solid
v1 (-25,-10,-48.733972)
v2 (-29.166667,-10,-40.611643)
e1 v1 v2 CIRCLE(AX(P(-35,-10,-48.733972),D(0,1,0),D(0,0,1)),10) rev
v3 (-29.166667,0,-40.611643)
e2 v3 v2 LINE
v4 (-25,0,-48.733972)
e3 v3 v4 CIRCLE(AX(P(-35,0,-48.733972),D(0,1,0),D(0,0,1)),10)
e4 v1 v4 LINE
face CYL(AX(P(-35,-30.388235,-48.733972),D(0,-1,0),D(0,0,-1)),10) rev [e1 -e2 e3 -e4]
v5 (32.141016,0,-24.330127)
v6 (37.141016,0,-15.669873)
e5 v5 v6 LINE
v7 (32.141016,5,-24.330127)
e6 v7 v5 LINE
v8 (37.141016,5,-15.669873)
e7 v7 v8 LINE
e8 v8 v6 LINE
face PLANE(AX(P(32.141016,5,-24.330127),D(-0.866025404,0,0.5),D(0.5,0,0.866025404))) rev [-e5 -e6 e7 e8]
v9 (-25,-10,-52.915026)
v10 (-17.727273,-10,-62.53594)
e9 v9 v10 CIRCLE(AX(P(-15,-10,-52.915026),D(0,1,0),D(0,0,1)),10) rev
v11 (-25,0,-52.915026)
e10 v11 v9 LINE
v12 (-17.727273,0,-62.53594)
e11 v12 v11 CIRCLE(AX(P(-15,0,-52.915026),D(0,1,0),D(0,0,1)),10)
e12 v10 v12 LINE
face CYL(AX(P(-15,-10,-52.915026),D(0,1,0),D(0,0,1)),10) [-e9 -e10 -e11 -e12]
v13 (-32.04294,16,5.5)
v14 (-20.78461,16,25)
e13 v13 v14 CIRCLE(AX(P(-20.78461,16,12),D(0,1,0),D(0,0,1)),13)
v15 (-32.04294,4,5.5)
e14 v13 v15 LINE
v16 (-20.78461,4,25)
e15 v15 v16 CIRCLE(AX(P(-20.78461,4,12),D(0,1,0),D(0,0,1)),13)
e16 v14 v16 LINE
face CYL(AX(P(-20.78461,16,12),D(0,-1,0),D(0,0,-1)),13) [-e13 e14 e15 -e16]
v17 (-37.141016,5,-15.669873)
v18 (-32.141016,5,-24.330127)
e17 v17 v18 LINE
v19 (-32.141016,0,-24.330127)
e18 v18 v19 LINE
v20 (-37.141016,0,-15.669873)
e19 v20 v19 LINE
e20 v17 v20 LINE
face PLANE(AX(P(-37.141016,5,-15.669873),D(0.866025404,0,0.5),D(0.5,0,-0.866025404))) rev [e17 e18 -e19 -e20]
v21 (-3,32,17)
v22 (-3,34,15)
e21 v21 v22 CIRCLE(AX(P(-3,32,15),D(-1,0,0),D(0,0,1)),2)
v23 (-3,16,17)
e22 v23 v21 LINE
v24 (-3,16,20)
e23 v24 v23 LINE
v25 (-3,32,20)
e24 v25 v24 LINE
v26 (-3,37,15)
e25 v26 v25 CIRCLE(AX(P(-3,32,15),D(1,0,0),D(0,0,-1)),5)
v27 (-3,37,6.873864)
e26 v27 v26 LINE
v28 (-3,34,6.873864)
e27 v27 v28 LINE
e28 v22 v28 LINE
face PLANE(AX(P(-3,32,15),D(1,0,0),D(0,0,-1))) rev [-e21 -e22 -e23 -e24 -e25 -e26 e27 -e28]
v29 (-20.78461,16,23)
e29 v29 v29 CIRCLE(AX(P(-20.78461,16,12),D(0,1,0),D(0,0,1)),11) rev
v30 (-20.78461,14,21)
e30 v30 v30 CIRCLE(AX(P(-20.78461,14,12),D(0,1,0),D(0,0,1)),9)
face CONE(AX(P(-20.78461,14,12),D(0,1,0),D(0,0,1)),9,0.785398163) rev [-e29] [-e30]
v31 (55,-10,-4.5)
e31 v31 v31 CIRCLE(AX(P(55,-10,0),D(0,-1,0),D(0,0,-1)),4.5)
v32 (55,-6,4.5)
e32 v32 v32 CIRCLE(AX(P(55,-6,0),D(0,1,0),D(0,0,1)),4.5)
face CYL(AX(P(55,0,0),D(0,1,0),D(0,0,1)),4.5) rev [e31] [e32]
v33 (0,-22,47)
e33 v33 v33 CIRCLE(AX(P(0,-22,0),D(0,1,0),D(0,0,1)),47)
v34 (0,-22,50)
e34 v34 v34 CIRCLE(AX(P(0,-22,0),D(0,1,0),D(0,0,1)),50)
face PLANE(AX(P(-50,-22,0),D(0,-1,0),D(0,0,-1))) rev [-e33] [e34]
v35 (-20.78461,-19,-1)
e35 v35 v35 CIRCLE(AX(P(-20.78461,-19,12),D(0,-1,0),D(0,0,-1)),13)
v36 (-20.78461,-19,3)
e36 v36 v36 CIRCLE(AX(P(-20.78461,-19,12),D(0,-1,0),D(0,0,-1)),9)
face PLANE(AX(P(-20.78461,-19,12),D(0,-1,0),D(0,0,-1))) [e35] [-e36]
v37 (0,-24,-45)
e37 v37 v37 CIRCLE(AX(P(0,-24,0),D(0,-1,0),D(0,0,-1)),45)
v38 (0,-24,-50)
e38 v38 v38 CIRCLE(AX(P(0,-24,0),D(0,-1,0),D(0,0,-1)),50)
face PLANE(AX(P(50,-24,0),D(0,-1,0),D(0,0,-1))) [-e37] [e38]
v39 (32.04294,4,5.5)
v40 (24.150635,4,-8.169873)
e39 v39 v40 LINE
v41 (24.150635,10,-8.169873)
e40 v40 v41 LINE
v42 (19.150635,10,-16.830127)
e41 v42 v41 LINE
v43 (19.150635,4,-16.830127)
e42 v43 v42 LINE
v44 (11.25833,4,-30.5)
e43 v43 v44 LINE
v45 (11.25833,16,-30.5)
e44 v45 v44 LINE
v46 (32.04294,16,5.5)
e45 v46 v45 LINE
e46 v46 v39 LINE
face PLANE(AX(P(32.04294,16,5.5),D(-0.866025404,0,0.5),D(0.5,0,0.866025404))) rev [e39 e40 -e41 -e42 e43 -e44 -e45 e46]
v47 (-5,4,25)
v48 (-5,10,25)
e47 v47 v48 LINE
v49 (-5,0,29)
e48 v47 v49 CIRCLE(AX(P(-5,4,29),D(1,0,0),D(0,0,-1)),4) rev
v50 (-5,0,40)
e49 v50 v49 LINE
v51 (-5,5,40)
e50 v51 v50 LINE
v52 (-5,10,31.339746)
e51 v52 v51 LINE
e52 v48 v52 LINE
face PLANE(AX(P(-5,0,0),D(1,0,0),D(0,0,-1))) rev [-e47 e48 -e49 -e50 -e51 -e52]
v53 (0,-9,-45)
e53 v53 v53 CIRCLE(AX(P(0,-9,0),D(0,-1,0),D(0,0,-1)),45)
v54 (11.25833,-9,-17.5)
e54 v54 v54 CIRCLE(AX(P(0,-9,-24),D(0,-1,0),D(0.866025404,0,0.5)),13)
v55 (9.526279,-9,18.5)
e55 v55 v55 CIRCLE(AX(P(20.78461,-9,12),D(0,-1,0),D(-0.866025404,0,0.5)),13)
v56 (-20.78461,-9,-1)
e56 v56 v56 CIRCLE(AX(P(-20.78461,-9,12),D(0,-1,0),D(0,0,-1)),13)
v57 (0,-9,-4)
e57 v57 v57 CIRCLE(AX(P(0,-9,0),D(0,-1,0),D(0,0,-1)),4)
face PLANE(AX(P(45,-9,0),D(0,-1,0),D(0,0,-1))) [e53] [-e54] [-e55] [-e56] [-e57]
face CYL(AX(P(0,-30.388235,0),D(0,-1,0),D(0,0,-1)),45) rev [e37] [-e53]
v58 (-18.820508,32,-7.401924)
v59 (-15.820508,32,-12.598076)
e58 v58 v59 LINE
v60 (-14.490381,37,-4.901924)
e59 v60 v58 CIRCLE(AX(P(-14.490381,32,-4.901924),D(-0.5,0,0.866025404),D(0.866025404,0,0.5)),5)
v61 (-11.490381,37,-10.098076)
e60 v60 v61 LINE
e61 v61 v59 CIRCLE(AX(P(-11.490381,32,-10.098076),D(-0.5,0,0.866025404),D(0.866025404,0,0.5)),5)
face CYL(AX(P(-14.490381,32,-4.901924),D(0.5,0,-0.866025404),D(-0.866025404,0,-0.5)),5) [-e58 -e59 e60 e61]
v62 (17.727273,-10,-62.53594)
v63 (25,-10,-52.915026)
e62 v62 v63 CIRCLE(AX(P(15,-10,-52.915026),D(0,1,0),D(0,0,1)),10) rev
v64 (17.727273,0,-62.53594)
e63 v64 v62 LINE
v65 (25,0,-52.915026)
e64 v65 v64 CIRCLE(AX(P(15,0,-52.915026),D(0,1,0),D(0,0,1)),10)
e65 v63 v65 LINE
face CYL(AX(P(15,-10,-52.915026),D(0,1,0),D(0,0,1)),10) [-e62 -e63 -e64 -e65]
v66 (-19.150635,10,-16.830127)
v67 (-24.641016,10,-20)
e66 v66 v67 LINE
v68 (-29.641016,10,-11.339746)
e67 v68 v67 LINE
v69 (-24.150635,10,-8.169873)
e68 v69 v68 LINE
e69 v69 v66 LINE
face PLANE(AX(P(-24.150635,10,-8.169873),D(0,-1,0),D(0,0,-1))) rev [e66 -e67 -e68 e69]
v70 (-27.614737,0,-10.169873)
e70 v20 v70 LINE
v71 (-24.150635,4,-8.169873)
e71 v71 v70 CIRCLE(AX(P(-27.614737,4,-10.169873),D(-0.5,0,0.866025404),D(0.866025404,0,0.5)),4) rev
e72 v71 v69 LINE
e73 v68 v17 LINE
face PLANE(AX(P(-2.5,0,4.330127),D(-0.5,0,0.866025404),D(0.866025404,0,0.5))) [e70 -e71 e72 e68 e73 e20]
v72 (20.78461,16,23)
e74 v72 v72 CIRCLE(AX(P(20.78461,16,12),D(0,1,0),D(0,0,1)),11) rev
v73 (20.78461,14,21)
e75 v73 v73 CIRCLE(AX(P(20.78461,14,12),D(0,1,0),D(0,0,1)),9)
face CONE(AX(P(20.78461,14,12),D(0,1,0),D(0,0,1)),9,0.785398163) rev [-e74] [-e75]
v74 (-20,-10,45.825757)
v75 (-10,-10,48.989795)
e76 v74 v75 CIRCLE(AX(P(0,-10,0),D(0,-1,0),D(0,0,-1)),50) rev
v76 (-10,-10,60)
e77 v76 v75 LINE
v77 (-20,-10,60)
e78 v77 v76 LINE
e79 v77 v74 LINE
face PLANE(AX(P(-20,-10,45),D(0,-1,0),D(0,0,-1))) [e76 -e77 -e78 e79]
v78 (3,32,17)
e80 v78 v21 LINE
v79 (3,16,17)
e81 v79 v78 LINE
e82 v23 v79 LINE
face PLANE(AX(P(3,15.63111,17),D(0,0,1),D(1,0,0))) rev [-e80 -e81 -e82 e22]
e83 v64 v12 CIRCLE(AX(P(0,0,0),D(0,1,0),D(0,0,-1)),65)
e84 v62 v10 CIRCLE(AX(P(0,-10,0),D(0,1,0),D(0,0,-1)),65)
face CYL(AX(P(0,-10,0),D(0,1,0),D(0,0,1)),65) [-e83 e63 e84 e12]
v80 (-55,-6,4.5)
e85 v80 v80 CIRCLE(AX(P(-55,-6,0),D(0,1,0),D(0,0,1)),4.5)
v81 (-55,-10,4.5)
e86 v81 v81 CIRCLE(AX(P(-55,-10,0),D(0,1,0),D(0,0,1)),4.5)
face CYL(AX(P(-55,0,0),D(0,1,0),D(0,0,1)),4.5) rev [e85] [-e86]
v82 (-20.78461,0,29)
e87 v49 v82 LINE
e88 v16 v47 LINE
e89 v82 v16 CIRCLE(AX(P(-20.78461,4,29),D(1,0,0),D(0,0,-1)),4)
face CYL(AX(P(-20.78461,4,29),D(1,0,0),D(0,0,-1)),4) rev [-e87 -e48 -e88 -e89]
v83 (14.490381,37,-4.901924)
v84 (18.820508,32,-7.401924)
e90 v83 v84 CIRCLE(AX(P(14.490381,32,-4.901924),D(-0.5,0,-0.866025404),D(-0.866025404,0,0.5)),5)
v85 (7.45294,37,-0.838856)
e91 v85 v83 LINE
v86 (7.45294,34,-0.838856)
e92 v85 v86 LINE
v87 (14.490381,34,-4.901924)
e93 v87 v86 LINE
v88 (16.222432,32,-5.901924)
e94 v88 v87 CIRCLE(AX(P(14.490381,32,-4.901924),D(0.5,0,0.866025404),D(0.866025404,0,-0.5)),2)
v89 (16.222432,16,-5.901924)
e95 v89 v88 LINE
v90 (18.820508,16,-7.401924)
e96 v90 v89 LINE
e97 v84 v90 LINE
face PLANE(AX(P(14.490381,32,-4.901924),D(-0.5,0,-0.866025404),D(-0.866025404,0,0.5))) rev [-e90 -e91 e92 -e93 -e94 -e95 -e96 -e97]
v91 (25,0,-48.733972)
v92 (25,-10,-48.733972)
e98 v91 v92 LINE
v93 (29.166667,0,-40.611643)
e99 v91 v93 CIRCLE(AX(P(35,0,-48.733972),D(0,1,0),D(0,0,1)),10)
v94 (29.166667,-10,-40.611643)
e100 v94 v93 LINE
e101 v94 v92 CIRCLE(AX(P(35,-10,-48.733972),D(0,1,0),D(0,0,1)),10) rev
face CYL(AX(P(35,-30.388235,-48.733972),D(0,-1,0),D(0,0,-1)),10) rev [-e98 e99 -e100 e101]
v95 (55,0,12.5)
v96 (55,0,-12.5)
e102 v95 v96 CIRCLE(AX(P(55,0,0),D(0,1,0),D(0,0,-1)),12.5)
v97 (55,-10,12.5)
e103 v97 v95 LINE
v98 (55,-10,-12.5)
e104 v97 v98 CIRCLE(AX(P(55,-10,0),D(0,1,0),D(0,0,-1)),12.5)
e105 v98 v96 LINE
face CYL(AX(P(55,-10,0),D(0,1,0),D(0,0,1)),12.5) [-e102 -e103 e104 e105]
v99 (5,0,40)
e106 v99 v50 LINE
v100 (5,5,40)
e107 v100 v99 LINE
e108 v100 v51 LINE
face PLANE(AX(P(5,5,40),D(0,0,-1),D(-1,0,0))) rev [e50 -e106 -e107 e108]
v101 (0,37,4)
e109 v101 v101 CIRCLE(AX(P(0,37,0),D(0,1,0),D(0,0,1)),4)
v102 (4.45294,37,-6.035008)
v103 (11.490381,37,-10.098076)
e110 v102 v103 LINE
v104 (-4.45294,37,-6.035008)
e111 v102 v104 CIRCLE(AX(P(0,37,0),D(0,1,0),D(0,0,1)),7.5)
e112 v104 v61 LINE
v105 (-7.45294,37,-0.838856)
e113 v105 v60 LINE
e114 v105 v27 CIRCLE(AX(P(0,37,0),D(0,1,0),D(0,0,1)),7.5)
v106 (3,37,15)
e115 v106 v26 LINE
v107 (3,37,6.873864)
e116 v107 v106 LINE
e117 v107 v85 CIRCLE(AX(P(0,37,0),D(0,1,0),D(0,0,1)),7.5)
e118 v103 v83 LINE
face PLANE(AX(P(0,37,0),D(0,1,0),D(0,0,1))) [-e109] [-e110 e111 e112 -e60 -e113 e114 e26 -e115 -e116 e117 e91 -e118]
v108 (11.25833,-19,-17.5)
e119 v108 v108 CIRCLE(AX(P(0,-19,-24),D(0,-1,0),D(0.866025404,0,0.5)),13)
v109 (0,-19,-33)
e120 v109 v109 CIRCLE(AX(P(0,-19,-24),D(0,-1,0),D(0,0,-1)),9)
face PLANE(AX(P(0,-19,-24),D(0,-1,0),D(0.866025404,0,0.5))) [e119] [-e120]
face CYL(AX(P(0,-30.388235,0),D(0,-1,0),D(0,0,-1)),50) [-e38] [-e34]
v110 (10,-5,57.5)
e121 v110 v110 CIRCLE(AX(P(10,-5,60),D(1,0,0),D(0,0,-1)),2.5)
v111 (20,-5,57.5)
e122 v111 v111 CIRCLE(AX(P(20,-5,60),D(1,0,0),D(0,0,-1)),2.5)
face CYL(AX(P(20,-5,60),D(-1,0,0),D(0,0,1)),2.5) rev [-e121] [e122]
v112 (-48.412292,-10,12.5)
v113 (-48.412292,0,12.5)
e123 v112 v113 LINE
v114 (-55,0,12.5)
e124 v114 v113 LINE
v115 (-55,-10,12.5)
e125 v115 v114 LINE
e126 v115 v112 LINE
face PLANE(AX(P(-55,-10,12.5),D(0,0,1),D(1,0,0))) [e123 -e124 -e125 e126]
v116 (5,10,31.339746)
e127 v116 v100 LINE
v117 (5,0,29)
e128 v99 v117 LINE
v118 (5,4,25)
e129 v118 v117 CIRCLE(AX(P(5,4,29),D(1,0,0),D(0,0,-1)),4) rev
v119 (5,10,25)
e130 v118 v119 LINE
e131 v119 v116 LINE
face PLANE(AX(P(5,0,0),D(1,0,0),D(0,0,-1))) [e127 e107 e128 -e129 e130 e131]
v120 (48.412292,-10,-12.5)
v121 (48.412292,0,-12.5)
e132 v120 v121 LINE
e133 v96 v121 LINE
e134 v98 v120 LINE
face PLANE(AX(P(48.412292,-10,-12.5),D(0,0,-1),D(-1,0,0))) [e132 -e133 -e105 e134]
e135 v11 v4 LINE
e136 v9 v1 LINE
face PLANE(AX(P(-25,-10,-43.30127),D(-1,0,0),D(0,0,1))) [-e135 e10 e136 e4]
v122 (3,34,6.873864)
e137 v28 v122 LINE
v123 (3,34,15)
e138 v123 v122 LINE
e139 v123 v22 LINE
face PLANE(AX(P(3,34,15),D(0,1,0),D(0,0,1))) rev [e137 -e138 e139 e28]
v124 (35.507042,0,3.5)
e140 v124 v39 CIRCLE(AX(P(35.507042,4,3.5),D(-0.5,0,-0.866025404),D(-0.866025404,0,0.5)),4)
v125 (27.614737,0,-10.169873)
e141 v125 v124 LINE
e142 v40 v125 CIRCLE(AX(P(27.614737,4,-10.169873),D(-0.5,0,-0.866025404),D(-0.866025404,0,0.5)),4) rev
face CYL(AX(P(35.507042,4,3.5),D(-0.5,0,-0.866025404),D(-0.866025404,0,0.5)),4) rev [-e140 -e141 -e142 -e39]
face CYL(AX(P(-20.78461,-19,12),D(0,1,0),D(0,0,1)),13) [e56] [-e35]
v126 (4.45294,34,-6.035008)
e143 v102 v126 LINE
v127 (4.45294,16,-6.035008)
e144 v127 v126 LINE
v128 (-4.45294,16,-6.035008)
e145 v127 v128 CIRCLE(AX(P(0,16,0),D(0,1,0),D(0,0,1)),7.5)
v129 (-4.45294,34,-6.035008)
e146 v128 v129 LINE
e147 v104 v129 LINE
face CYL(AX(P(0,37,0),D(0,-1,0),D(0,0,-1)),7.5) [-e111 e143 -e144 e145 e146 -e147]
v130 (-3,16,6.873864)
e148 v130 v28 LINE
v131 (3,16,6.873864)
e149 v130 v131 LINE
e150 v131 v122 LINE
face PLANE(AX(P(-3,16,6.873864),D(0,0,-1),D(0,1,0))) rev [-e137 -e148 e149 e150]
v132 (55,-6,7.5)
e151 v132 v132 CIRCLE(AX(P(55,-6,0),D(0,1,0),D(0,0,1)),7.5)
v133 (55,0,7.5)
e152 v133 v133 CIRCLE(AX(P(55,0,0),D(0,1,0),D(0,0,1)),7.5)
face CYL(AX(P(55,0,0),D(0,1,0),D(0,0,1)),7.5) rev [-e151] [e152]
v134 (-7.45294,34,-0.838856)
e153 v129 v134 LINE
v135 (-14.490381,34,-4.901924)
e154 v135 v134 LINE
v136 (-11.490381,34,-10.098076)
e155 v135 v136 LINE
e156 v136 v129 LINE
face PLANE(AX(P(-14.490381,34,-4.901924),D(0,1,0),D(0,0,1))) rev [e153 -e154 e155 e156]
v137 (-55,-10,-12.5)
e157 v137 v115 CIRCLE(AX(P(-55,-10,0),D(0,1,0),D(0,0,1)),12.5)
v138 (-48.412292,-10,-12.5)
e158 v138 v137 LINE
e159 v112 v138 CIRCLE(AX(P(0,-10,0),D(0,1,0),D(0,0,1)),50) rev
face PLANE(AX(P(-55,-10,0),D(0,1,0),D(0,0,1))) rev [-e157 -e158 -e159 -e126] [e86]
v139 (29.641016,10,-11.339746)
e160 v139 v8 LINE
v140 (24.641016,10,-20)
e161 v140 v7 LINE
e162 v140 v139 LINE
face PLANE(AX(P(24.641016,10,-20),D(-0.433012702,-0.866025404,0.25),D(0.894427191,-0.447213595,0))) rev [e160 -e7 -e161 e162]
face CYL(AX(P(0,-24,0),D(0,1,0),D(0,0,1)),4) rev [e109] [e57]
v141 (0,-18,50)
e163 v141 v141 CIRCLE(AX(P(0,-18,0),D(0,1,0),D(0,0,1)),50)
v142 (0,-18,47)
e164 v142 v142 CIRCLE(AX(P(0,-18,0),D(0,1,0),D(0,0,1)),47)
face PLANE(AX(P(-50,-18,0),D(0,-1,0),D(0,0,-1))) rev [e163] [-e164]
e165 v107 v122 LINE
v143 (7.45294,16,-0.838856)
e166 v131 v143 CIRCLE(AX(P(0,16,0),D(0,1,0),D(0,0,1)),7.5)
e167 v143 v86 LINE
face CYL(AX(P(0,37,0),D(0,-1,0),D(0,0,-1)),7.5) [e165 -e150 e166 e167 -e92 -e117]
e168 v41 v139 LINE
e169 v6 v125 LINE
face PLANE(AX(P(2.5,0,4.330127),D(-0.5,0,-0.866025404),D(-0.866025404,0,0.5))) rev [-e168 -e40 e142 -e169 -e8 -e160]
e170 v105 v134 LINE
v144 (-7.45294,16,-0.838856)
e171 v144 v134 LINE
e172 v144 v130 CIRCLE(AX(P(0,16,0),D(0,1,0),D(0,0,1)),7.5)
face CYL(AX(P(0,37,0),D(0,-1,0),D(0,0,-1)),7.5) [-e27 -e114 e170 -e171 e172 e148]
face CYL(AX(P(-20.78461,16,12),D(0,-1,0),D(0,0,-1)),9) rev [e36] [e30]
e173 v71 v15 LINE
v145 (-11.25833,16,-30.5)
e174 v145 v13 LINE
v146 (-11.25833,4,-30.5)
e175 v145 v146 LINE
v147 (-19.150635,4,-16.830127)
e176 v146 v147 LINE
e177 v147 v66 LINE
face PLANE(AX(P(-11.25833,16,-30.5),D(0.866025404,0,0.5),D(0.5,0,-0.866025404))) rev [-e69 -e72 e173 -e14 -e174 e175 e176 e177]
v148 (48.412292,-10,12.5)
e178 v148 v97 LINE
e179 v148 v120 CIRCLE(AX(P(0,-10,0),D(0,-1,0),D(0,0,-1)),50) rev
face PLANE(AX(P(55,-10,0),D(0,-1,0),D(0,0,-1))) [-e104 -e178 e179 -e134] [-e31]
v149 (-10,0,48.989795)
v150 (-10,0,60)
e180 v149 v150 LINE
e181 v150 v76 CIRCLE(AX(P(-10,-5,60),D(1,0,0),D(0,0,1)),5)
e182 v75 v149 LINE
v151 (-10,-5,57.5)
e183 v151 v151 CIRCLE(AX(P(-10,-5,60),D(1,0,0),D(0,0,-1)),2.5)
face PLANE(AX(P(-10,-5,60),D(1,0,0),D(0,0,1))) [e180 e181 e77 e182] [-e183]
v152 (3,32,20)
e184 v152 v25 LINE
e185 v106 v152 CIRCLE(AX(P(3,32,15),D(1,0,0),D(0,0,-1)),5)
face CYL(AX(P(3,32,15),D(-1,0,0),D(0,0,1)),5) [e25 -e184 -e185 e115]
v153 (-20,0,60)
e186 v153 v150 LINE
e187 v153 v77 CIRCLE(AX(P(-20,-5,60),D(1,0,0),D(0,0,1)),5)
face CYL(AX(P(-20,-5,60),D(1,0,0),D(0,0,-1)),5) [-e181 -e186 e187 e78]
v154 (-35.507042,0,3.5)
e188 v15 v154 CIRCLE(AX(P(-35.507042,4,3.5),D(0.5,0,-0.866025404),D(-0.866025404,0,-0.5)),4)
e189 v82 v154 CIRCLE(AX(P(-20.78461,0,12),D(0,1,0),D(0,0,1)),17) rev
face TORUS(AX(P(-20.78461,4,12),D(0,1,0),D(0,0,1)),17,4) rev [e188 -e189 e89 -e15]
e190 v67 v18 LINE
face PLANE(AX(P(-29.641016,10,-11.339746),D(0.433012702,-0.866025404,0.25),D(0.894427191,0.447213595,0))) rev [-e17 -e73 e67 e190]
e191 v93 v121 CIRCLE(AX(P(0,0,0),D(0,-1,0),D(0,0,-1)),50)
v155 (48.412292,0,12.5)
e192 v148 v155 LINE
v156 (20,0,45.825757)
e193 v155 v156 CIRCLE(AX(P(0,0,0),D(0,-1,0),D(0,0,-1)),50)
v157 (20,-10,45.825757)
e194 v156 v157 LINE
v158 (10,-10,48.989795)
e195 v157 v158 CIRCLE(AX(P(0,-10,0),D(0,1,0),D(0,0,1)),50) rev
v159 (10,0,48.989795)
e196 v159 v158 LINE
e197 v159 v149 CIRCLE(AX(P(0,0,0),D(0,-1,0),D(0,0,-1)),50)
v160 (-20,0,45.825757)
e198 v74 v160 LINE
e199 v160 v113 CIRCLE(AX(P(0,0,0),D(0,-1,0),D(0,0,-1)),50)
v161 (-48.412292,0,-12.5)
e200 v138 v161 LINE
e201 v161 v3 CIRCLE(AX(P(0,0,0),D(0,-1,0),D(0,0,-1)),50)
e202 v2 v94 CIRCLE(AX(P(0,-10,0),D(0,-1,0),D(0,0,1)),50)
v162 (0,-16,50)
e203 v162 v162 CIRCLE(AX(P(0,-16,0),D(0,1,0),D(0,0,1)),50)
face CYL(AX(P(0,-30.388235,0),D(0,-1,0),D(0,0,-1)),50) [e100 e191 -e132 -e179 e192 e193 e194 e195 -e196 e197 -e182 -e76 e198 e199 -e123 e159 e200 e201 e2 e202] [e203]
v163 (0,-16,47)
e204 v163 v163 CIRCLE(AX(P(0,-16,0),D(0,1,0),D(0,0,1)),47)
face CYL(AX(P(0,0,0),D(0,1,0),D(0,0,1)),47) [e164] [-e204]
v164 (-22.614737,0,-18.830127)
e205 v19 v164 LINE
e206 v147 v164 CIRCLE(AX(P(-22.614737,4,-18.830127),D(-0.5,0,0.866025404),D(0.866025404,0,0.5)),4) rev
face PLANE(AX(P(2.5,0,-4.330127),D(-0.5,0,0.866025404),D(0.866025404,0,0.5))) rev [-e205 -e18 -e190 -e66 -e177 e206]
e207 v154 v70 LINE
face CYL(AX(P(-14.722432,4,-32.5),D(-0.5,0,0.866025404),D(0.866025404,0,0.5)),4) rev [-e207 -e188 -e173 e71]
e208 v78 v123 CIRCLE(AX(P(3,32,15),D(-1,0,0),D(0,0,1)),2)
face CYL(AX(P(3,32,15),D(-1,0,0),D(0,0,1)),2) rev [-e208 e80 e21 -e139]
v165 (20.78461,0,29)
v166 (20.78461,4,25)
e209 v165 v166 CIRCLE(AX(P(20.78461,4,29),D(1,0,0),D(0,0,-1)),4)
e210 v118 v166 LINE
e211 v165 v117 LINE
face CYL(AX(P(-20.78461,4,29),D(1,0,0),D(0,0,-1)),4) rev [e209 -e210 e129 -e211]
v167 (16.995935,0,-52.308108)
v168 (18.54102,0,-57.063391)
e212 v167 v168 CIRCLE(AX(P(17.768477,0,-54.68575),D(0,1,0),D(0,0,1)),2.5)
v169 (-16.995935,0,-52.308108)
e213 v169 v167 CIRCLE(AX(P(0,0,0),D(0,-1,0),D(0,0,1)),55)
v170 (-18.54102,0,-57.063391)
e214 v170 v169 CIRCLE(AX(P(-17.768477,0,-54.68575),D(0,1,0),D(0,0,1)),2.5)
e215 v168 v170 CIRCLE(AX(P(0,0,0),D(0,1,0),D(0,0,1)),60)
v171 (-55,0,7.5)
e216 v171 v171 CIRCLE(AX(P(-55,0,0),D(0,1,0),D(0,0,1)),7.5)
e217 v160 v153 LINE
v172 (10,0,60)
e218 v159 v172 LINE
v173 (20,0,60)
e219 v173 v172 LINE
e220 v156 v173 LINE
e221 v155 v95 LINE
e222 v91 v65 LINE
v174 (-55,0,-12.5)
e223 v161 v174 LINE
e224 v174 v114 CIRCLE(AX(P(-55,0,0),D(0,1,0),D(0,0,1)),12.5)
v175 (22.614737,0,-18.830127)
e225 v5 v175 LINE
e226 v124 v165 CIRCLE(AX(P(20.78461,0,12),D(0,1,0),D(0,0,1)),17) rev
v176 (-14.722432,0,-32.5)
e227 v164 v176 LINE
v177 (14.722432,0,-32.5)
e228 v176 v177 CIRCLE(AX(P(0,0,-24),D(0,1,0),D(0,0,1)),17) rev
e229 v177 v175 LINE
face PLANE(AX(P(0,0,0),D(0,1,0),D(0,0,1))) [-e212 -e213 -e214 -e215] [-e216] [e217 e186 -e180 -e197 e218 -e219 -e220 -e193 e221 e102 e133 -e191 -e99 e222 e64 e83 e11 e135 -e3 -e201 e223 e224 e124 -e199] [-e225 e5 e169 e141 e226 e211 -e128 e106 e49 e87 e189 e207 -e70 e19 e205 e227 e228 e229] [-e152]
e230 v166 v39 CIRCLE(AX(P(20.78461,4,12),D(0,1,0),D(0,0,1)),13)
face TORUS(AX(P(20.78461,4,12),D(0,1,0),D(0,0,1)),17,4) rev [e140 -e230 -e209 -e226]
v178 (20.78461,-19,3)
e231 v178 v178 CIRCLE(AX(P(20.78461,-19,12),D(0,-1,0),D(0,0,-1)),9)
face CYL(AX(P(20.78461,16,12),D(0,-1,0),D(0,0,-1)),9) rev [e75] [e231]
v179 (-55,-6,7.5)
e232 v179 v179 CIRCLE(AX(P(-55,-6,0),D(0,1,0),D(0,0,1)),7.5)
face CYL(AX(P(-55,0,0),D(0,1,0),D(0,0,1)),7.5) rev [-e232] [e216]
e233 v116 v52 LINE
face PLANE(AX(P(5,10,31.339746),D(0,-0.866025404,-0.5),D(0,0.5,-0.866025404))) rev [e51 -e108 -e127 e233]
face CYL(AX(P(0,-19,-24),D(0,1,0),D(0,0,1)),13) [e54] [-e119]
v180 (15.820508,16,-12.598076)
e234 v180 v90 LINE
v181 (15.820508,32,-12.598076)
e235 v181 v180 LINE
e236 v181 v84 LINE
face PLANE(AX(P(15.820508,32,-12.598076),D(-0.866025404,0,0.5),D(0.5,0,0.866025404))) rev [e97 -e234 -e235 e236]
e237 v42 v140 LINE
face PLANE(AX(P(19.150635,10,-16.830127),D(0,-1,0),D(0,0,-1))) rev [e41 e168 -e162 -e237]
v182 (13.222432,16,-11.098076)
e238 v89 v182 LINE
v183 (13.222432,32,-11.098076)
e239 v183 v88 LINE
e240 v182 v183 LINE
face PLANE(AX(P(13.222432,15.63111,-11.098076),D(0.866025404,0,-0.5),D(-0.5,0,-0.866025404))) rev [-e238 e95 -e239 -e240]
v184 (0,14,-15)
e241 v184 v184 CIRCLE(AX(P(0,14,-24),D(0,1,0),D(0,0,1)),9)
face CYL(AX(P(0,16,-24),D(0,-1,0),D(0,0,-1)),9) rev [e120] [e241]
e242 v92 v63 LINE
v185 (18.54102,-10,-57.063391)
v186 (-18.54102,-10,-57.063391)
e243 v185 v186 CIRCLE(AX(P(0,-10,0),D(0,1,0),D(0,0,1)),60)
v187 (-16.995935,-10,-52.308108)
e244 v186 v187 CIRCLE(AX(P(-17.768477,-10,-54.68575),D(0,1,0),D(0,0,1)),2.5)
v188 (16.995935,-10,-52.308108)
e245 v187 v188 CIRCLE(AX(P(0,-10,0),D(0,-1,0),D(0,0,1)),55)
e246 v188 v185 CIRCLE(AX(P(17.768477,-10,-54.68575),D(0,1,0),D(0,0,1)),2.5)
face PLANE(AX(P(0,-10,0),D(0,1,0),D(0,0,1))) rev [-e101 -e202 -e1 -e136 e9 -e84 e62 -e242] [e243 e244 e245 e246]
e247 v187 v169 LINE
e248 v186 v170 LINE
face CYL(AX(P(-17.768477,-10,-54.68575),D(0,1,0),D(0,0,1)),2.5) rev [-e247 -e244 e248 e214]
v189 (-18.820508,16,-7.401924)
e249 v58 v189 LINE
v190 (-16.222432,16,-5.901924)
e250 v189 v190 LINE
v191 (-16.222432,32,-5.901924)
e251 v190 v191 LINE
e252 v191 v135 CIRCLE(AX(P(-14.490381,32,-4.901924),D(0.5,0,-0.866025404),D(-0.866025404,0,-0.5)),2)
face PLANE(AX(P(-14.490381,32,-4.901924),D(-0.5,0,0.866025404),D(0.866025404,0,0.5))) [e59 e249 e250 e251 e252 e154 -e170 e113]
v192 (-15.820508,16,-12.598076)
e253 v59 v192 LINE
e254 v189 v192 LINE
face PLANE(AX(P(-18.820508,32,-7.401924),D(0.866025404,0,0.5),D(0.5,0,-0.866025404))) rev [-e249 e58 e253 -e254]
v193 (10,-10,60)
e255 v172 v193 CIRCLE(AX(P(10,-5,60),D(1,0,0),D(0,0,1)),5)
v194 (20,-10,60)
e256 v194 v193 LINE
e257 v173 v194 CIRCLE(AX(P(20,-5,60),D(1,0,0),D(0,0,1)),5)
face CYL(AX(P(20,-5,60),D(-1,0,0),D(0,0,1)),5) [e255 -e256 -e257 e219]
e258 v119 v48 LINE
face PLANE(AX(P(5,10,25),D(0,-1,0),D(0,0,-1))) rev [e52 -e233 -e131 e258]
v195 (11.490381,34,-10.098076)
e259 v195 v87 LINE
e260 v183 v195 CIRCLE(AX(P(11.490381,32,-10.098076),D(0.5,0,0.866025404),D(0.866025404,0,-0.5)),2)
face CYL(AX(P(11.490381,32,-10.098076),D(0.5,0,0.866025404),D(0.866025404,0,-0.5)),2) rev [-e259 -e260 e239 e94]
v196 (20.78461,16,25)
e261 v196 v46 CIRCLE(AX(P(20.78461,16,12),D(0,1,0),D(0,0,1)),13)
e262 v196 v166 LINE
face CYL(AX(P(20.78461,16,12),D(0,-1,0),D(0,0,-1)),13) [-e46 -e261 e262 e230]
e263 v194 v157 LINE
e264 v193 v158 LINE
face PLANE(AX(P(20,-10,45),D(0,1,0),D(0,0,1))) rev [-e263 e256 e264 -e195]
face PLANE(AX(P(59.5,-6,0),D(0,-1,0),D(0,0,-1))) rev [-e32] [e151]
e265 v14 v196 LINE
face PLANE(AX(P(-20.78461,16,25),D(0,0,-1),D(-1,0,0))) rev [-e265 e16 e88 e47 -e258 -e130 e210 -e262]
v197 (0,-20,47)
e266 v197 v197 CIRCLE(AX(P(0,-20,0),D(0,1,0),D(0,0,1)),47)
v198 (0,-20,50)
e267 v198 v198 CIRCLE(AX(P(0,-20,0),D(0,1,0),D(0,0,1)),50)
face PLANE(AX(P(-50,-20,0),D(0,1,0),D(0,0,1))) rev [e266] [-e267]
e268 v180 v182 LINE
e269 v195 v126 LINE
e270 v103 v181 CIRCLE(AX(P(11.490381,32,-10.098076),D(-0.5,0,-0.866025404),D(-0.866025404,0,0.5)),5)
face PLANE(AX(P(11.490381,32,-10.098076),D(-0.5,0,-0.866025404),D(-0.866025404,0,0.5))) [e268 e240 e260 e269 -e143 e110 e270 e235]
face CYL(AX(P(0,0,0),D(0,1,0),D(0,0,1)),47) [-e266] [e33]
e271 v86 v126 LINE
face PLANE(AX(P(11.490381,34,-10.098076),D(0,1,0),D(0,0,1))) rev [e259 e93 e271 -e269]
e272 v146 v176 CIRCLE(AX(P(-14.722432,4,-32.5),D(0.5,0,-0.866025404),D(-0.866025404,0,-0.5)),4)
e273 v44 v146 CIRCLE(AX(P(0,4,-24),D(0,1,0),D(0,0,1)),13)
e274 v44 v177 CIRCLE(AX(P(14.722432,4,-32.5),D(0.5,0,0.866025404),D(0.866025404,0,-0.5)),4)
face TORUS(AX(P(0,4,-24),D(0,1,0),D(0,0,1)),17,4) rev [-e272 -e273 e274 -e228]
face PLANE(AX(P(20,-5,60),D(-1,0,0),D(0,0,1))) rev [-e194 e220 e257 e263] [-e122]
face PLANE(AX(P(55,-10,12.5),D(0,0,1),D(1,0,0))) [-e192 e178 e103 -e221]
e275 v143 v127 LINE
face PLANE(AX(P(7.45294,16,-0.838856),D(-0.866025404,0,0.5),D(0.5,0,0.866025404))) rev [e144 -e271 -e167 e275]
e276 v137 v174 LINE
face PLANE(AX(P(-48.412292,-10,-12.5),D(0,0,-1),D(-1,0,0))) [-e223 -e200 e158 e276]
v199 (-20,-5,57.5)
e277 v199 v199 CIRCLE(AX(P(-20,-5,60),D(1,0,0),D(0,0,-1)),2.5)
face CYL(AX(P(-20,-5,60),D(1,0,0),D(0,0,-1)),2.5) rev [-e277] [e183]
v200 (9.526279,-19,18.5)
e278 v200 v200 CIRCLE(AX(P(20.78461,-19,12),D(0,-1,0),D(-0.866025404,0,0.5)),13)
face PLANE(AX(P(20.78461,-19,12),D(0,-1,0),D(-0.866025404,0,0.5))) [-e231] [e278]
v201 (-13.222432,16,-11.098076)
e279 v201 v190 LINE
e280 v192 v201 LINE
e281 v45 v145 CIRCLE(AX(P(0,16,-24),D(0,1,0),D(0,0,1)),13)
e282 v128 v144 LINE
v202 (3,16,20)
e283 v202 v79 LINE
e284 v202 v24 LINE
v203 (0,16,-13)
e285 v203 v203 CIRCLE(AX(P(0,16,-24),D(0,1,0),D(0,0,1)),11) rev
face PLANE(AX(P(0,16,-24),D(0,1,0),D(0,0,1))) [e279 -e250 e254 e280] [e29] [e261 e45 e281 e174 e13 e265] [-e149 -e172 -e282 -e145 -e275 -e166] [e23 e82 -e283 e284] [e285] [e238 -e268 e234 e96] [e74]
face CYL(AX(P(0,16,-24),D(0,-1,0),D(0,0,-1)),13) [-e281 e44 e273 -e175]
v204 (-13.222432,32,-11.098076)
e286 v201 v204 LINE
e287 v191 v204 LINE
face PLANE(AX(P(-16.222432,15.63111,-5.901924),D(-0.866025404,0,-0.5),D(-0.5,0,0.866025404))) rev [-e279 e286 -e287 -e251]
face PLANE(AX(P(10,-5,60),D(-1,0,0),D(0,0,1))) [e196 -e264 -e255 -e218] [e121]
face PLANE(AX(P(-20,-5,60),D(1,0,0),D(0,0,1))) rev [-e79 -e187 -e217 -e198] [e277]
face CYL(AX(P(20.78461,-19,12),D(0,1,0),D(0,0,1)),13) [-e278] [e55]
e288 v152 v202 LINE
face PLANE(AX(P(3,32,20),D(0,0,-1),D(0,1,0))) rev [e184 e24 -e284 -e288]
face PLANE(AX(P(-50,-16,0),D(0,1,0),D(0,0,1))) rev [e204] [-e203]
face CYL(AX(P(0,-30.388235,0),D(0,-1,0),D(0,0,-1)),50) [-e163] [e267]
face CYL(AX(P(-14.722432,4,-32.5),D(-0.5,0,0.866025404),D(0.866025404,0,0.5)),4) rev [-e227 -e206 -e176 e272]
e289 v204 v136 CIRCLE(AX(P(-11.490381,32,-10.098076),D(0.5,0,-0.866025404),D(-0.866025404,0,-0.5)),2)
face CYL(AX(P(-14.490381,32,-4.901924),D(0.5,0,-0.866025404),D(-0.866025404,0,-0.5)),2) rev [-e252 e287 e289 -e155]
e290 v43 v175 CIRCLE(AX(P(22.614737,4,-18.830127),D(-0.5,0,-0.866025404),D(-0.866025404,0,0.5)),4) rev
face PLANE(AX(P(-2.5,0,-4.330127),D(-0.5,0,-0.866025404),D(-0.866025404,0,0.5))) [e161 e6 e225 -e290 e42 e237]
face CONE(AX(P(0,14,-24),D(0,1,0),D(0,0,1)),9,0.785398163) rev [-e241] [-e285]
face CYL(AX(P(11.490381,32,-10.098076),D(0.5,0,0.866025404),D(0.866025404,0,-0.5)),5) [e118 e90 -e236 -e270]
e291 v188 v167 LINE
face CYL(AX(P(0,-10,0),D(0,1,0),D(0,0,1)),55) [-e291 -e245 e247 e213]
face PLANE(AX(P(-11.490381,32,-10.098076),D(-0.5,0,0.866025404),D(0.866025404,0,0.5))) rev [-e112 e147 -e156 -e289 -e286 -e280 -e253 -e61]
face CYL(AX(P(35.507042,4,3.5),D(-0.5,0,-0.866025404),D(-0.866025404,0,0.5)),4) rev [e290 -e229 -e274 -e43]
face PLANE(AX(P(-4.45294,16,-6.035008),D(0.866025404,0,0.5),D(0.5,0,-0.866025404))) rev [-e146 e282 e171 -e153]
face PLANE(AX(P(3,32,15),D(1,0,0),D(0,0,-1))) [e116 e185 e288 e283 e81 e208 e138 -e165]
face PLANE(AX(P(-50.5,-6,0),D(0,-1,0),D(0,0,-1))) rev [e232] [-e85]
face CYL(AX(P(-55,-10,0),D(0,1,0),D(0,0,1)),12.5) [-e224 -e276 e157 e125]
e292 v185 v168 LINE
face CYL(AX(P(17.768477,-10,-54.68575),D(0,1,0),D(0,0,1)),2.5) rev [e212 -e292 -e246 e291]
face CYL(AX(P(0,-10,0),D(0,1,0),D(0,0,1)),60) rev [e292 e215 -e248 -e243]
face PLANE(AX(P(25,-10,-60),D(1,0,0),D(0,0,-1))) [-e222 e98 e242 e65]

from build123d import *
from build123d.topology import SkipClean

# Parameters (mm, degrees)
BOSS_EXTRUDE1_DEPTH                              = 10
SKETCH3_R                                        = 9
BOSS_EXTRUDE2_DEPTH                              = 16
FILLET1_R                                        = 4
CHAMFER1_SIZE                                    = 2
BOSS_EXTRUDE3_START                              = 10
SKETCH5_R                                        = 13
BOSS_EXTRUDE3_DEPTH                              = 10
CUT_EXTRUDE1_DEPTH                               = 94.03897033
CUT_EXTRUDE1_DEPTH_BACK                          = 94.03897033
SKETCH4_R                                        = 9
CIRPATTERN1_COUNT                                = 3
CUT_EXTRUDE2_DEPTH                               = 94.03897033
CUT_EXTRUDE2_DEPTH_BACK                          = 94.03897033
SKETCH7_R                                        = 9
CBORE_FOR_M8_HEX_HEAD_MACHINE_SCREW1_D           = 9
CBORE_FOR_M8_HEX_HEAD_MACHINE_SCREW1_CBORE_D     = 15
CBORE_FOR_M8_HEX_HEAD_MACHINE_SCREW1_CBORE_DEPTH = 6
SKETCH11_W                                       = 3
SKETCH11_H                                       = 2
BOSS_EXTRUDE4_DEPTH                              = 5
CIRPATTERN2_COUNT                                = 3
SKETCH14_R                                       = 2.5
BOSS_EXTRUDE5_DEPTH                              = 10
BOSS_EXTRUDE6_START                              = -10
BOSS_EXTRUDE6_DEPTH                              = 10
SKETCH16_R                                       = 7.5
BOSS_EXTRUDE7_DEPTH                              = 21
CUT_EXTRUDE4_DEPTH                               = 112.813460728
CUT_EXTRUDE4_DEPTH_BACK                          = 112.813460728
SKETCH17_R                                       = 4
BOSS_EXTRUDE9_DEPTH                              = 3
CUT_EXTRUDE5_DEPTH                               = 3
CIRPATTERN3_COUNT                                = 3
FILLET6_R                                        = 10
FILLET7_R                                        = 10
FILLET8_R                                        = 10
FILLET9_R                                        = 10


with BuildPart() as part:
    # Sketch1 → Revolve1 (revolve)
    with BuildSketch(Plane.XY, mode=Mode.PRIVATE) as revolve1_sk:
        Polygon((0, 0), (50, 0), (50, -24), (45, -24), (45, -9), (0, -9), align=None)
    revolve(revolve1_sk.sketch.rotate(Axis((0, -30.388235294, 0), (0, 1, 0)), 90), axis=Axis((0, -30.388235294, 0), (0, 1, 0)))

    # Sketch2 → Boss-Extrude1 (add)
    with BuildSketch(Plane(origin=(0, 0, 0), x_dir=(1, 0, 0), z_dir=(0, 1, 0))):
        with BuildLine():
            Line((-48.412291828, 12.5), (-55, 12.5))
            ThreePointArc((-55, 12.5), (-67.5, 0), (-55, -12.5))
            Line((-55, -12.5), (-48.412291828, -12.5))
            Line((-48.412291828, -12.5), (-48.412291828, 12.5))
        make_face()
        with BuildLine():
            Line((48.412291828, -12.5), (48.412291828, 12.5))
            Line((48.412291828, 12.5), (55, 12.5))
            ThreePointArc((55, 12.5), (67.5, 0), (55, -12.5))
            Line((55, -12.5), (48.412291828, -12.5))
        make_face()
    extrude(amount=-BOSS_EXTRUDE1_DEPTH)

    # Sketch3 → Boss-Extrude2 (add)
    with BuildSketch(Plane(origin=(0, 0, 0), x_dir=(1, 0, 0), z_dir=(0, 1, 0))):
        with BuildLine():
            Line((32.04293994, -5.5), (11.258330249, 30.5))
            ThreePointArc((11.258330249, 30.5), (0, 37), (-11.258330249, 30.5))
            Line((-11.258330249, 30.5), (-32.04293994, -5.5))
            ThreePointArc((-32.04293994, -5.5), (-32.04293994, -18.5), (-20.784609691, -25))
            Line((-20.784609691, -25), (20.784609691, -25))
            ThreePointArc((20.784609691, -25), (32.04293994, -18.5), (32.04293994, -5.5))
        make_face()
        with Locations(Location((0, 24, 0), (0, 0, 270))):
            Circle(SKETCH3_R, mode=Mode.SUBTRACT)
        with Locations(Location((20.784609691, -12, 0), (0, 0, 270))):
            Circle(SKETCH3_R, mode=Mode.SUBTRACT)
        with Locations(Location((-20.784609691, -12, 0), (0, 0, 270))):
            Circle(SKETCH3_R, mode=Mode.SUBTRACT)
    extrude(amount=BOSS_EXTRUDE2_DEPTH)

    # Fillet1
    fillet1_edges = [part.edges().sort_by_distance(p)[0] for p in [
        (0, 0, -37),
        (-21.650635095, 0, -12.5),
        (-32.04293994, 0, 18.5),
        (0, 0, 25),
        (32.04293994, 0, 18.5),
        (21.650635095, 0, -12.5),
    ]]
    fillet(fillet1_edges, radius=FILLET1_R)

    # Chamfer1
    chamfer1_edges = [part.edges().sort_by_distance(p)[0] for p in [
        (20.784609691, 16, 3),
        (0, 16, -33),
        (-20.784609691, 16, 3),
    ]]
    chamfer(chamfer1_edges, length=CHAMFER1_SIZE)

    # Sketch5 → Boss-Extrude3 (add)
    with BuildSketch(Plane.XZ.offset(9).offset(BOSS_EXTRUDE3_START)):
        with Locations(Location((-20.784609691, 12, 0), (0, 0, 270))):
            Circle(SKETCH5_R)
    boss_extrude3 = extrude(amount=-BOSS_EXTRUDE3_DEPTH)

    # Sketch4 → Cut-Extrude1 (cut, two sides: drawn at the far end of the back side and taken through both)
    with SkipClean():  # the faces are left unmerged after this step: merging them gives an invalid solid
        with BuildSketch(Plane(origin=(0, 16, 0), x_dir=(1, 0, 0), z_dir=(0, 1, 0)).offset(-CUT_EXTRUDE1_DEPTH_BACK)):
            with Locations(Location((0, 24, 0), (0, 0, 90))):
                Circle(SKETCH4_R)
            with Locations(Location((20.784609691, -12, 0), (0, 0, 90))):
                Circle(SKETCH4_R)
            with Locations(Location((-20.784609691, -12, 0), (0, 0, 90))):
                Circle(SKETCH4_R)
        extrude(amount=CUT_EXTRUDE1_DEPTH + CUT_EXTRUDE1_DEPTH_BACK, mode=Mode.SUBTRACT)

    # CirPattern1: Boss-Extrude3 ×3 about axis
    with SkipClean():  # the faces are left unmerged after this step: merging them gives an invalid solid
        cirpattern1_axis = Axis((0, 0, 0), (0, 1, 0))
        for i in range(1, CIRPATTERN1_COUNT):
            add(boss_extrude3.rotate(cirpattern1_axis, i * 360 / CIRPATTERN1_COUNT))

    # Sketch7 → Cut-Extrude2 (cut, two sides: drawn at the far end of the back side and taken through both)
    with SkipClean():  # the faces are left unmerged after this step: merging them gives an invalid solid
        with BuildSketch(Plane(origin=(0, 16, 0), x_dir=(1, 0, 0), z_dir=(0, 1, 0)).offset(-CUT_EXTRUDE2_DEPTH_BACK)):
            with Locations(Location((0, 24, 0), (0, 0, 90))):
                Circle(SKETCH7_R)
            with Locations(Location((20.784609691, -12, 0), (0, 0, 90))):
                Circle(SKETCH7_R)
        extrude(amount=CUT_EXTRUDE2_DEPTH + CUT_EXTRUDE2_DEPTH_BACK, mode=Mode.SUBTRACT)

    # CBORE for M8 Hex Head Machine Screw1 (through all)
    with Locations(Plane(origin=(0, 0, 0), x_dir=(1, 0, 0), z_dir=(0, 1, 0))):
        with Locations((-55, 0), (55, 0)):
            CounterBoreHole(CBORE_FOR_M8_HEX_HEAD_MACHINE_SCREW1_D / 2, CBORE_FOR_M8_HEX_HEAD_MACHINE_SCREW1_CBORE_D / 2, CBORE_FOR_M8_HEX_HEAD_MACHINE_SCREW1_CBORE_DEPTH)

    # Sketch11 → Cut-Revolve1 (revolve, cut)
    with SkipClean():  # the faces are left unmerged after this step: merging them gives an invalid solid
        with BuildSketch(Plane.XY, mode=Mode.PRIVATE) as cut_revolve1_sk:
            with Locations((-48.5, -17)):
                Rectangle(SKETCH11_W, SKETCH11_H)
            with Locations((-48.5, -21)):
                Rectangle(SKETCH11_W, SKETCH11_H)
        revolve(cut_revolve1_sk.sketch.rotate(Axis((0, 0, 0), (0, -1, 0)), 270), axis=Axis((0, 0, 0), (0, -1, 0)), mode=Mode.SUBTRACT)

    # Sketch12 → Boss-Extrude4 (add, symmetric)
    with SkipClean():  # the faces are left unmerged after this step: merging them gives an invalid solid
        with BuildSketch(Plane(origin=(0, 0, 0), x_dir=(0, 0, -1), z_dir=(1, 0, 0))):
            Polygon((-25, 10), (-31.339745962, 10), (-40, 5), (-40, 0), (-25, 0), align=None)
        boss_extrude4 = extrude(amount=BOSS_EXTRUDE4_DEPTH, both=True)

    # CirPattern2: Boss-Extrude4 ×3 about axis
    with SkipClean():  # the faces are left unmerged after this step: merging them gives an invalid solid
        cirpattern2_axis = Axis((0, 0, 0), (0, 1, 0))
        for i in range(1, CIRPATTERN2_COUNT):
            add(boss_extrude4.rotate(cirpattern2_axis, i * 360 / CIRPATTERN2_COUNT))

    # Sketch14 → Boss-Extrude5 (add)
    with SkipClean():  # the faces are left unmerged after this step: merging them gives an invalid solid
        with BuildSketch(Plane(origin=(10, 0, 0), x_dir=(0, 0, -1), z_dir=(1, 0, 0))):
            with BuildLine():
                Line((-60, 0), (-45, 0))
                Line((-45, 0), (-45, -10))
                Line((-45, -10), (-60, -10))
                ThreePointArc((-60, -10), (-65, -5), (-60, 0))
            make_face()
            with Locations((-60, -5)):
                Circle(SKETCH14_R, mode=Mode.SUBTRACT)
        boss_extrude5 = extrude(amount=BOSS_EXTRUDE5_DEPTH)

    # Mirror1: Boss-Extrude5 across plane
    with SkipClean():  # the faces are left unmerged after this step: merging them gives an invalid solid
        add(boss_extrude5.mirror(Plane(origin=(0, 0, 0), x_dir=(0, 0, 1), z_dir=(1, 0, 0))))

    # Sketch15 → Boss-Extrude6 (add)
    with SkipClean():  # the faces are left unmerged after this step: merging them gives an invalid solid
        with BuildSketch(Plane(origin=(0, 0, 0), x_dir=(1, 0, 0), z_dir=(0, 1, 0)).offset(BOSS_EXTRUDE6_START)):
            with BuildLine():
                Line((-25, 43.301270189), (-25, 60))
                ThreePointArc((-25, 60), (0, 65), (25, 60))
                Line((25, 60), (25, 43.301270189))
                ThreePointArc((25, 43.301270189), (0, 50), (-25, 43.301270189))
            make_face()
            with BuildLine():
                ThreePointArc((18.541019662, 57.063390978), (0, 60), (-18.541019662, 57.063390978))
                ThreePointArc((-18.541019662, 57.063390978), (-20.146118467, 53.913207201), (-16.995934691, 52.308108396))
                ThreePointArc((-16.995934691, 52.308108396), (0, 55), (16.995934691, 52.308108396))
                ThreePointArc((16.995934691, 52.308108396), (20.146118467, 53.913207201), (18.541019662, 57.063390978))
            make_face(mode=Mode.SUBTRACT)
        extrude(amount=BOSS_EXTRUDE6_DEPTH)

    # Sketch16 → Boss-Extrude7 (add)
    with SkipClean():  # the faces are left unmerged after this step: merging them gives an invalid solid
        with BuildSketch(Plane(origin=(0, 16, 0), x_dir=(1, 0, 0), z_dir=(0, 1, 0))):
            with Locations(Location((0, 0, 0), (0, 0, 90))):
                Circle(SKETCH16_R)
        extrude(amount=BOSS_EXTRUDE7_DEPTH)

    # Sketch17 → Cut-Extrude4 (cut, two sides: drawn at the far end of the back side and taken through both)
    with SkipClean():  # the faces are left unmerged after this step: merging them gives an invalid solid
        with BuildSketch(Plane(origin=(0, 37, 0), x_dir=(1, 0, 0), z_dir=(0, 1, 0)).offset(-CUT_EXTRUDE4_DEPTH_BACK)):
            with Locations(Location((0, 0, 0), (0, 0, 270))):
                Circle(SKETCH17_R)
        extrude(amount=CUT_EXTRUDE4_DEPTH + CUT_EXTRUDE4_DEPTH_BACK, mode=Mode.SUBTRACT)

    # Sketch19 → Boss-Extrude9 (add, symmetric)
    with SkipClean():  # the faces are left unmerged after this step: merging them gives an invalid solid
        with BuildSketch(Plane(origin=(0, 0, 0), x_dir=(0, 0, -1), z_dir=(1, 0, 0))):
            with BuildLine():
                Line((-5.5, 37), (-15, 37))
                ThreePointArc((-15, 37), (-18.535533906, 35.535533906), (-20, 32))
                Line((-20, 32), (-20, 15.631109771))
                Line((-20, 15.631109771), (-17, 15.631109771))
                Line((-17, 15.631109771), (-17, 32))
                ThreePointArc((-17, 32), (-16.414213562, 33.414213562), (-15, 34))
                Line((-15, 34), (-5.5, 34))
                Line((-5.5, 34), (-5.5, 37))
            make_face()
        boss_extrude9 = extrude(amount=BOSS_EXTRUDE9_DEPTH, both=True)

    # Sketch21 → Cut-Extrude5 (cut, symmetric)
    with SkipClean():  # the faces are left unmerged after this step: merging them gives an invalid solid
        with BuildSketch(Plane(origin=(0, 0, 0), x_dir=(0, 0, -1), z_dir=(1, 0, 0))):
            with BuildLine():
                Line((-17, 16), (-17, 32))
                ThreePointArc((-17, 32), (-16.414213562, 33.414213562), (-15, 34))
                Line((-15, 34), (-6.873863542, 34))
                Line((-6.873863542, 34), (-6.873863542, 16))
                Line((-6.873863542, 16), (-17, 16))
            make_face()
        cut_extrude5 = extrude(amount=CUT_EXTRUDE5_DEPTH, both=True, mode=Mode.SUBTRACT)

    # CirPattern3: Boss-Extrude9, Cut-Extrude5 ×3 about axis
    with SkipClean():  # the faces are left unmerged after this step: merging them gives an invalid solid
        cirpattern3_axis = Axis((0, 0, 0), (0, 1, 0))
        add([boss_extrude9.rotate(cirpattern3_axis, i * 360 / CIRPATTERN3_COUNT) for i in range(1, CIRPATTERN3_COUNT)])
        add([cut_extrude5.rotate(cirpattern3_axis, i * 360 / CIRPATTERN3_COUNT) for i in range(1, CIRPATTERN3_COUNT)], mode=Mode.SUBTRACT)

    # Fillet6
    fillet6_edges = [part.edges().sort_by_distance(p)[0] for p in [
        (25, -5, -43.301270189),
    ]]
    fillet(fillet6_edges, radius=FILLET6_R)

    # Fillet7
    fillet7_edges = [part.edges().sort_by_distance(p)[0] for p in [
        (25, -5, -60),
    ]]
    fillet(fillet7_edges, radius=FILLET7_R)

    # Fillet8
    fillet8_edges = [part.edges().sort_by_distance(p)[0] for p in [
        (-25, -5, -60),
    ]]
    fillet(fillet8_edges, radius=FILLET8_R)

    # Fillet9
    fillet9_edges = [part.edges().sort_by_distance(p)[0] for p in [
        (-25, -5, -43.301270189),
    ]]
    fillet(fillet9_edges, radius=FILLET9_R)


solid = part.part
